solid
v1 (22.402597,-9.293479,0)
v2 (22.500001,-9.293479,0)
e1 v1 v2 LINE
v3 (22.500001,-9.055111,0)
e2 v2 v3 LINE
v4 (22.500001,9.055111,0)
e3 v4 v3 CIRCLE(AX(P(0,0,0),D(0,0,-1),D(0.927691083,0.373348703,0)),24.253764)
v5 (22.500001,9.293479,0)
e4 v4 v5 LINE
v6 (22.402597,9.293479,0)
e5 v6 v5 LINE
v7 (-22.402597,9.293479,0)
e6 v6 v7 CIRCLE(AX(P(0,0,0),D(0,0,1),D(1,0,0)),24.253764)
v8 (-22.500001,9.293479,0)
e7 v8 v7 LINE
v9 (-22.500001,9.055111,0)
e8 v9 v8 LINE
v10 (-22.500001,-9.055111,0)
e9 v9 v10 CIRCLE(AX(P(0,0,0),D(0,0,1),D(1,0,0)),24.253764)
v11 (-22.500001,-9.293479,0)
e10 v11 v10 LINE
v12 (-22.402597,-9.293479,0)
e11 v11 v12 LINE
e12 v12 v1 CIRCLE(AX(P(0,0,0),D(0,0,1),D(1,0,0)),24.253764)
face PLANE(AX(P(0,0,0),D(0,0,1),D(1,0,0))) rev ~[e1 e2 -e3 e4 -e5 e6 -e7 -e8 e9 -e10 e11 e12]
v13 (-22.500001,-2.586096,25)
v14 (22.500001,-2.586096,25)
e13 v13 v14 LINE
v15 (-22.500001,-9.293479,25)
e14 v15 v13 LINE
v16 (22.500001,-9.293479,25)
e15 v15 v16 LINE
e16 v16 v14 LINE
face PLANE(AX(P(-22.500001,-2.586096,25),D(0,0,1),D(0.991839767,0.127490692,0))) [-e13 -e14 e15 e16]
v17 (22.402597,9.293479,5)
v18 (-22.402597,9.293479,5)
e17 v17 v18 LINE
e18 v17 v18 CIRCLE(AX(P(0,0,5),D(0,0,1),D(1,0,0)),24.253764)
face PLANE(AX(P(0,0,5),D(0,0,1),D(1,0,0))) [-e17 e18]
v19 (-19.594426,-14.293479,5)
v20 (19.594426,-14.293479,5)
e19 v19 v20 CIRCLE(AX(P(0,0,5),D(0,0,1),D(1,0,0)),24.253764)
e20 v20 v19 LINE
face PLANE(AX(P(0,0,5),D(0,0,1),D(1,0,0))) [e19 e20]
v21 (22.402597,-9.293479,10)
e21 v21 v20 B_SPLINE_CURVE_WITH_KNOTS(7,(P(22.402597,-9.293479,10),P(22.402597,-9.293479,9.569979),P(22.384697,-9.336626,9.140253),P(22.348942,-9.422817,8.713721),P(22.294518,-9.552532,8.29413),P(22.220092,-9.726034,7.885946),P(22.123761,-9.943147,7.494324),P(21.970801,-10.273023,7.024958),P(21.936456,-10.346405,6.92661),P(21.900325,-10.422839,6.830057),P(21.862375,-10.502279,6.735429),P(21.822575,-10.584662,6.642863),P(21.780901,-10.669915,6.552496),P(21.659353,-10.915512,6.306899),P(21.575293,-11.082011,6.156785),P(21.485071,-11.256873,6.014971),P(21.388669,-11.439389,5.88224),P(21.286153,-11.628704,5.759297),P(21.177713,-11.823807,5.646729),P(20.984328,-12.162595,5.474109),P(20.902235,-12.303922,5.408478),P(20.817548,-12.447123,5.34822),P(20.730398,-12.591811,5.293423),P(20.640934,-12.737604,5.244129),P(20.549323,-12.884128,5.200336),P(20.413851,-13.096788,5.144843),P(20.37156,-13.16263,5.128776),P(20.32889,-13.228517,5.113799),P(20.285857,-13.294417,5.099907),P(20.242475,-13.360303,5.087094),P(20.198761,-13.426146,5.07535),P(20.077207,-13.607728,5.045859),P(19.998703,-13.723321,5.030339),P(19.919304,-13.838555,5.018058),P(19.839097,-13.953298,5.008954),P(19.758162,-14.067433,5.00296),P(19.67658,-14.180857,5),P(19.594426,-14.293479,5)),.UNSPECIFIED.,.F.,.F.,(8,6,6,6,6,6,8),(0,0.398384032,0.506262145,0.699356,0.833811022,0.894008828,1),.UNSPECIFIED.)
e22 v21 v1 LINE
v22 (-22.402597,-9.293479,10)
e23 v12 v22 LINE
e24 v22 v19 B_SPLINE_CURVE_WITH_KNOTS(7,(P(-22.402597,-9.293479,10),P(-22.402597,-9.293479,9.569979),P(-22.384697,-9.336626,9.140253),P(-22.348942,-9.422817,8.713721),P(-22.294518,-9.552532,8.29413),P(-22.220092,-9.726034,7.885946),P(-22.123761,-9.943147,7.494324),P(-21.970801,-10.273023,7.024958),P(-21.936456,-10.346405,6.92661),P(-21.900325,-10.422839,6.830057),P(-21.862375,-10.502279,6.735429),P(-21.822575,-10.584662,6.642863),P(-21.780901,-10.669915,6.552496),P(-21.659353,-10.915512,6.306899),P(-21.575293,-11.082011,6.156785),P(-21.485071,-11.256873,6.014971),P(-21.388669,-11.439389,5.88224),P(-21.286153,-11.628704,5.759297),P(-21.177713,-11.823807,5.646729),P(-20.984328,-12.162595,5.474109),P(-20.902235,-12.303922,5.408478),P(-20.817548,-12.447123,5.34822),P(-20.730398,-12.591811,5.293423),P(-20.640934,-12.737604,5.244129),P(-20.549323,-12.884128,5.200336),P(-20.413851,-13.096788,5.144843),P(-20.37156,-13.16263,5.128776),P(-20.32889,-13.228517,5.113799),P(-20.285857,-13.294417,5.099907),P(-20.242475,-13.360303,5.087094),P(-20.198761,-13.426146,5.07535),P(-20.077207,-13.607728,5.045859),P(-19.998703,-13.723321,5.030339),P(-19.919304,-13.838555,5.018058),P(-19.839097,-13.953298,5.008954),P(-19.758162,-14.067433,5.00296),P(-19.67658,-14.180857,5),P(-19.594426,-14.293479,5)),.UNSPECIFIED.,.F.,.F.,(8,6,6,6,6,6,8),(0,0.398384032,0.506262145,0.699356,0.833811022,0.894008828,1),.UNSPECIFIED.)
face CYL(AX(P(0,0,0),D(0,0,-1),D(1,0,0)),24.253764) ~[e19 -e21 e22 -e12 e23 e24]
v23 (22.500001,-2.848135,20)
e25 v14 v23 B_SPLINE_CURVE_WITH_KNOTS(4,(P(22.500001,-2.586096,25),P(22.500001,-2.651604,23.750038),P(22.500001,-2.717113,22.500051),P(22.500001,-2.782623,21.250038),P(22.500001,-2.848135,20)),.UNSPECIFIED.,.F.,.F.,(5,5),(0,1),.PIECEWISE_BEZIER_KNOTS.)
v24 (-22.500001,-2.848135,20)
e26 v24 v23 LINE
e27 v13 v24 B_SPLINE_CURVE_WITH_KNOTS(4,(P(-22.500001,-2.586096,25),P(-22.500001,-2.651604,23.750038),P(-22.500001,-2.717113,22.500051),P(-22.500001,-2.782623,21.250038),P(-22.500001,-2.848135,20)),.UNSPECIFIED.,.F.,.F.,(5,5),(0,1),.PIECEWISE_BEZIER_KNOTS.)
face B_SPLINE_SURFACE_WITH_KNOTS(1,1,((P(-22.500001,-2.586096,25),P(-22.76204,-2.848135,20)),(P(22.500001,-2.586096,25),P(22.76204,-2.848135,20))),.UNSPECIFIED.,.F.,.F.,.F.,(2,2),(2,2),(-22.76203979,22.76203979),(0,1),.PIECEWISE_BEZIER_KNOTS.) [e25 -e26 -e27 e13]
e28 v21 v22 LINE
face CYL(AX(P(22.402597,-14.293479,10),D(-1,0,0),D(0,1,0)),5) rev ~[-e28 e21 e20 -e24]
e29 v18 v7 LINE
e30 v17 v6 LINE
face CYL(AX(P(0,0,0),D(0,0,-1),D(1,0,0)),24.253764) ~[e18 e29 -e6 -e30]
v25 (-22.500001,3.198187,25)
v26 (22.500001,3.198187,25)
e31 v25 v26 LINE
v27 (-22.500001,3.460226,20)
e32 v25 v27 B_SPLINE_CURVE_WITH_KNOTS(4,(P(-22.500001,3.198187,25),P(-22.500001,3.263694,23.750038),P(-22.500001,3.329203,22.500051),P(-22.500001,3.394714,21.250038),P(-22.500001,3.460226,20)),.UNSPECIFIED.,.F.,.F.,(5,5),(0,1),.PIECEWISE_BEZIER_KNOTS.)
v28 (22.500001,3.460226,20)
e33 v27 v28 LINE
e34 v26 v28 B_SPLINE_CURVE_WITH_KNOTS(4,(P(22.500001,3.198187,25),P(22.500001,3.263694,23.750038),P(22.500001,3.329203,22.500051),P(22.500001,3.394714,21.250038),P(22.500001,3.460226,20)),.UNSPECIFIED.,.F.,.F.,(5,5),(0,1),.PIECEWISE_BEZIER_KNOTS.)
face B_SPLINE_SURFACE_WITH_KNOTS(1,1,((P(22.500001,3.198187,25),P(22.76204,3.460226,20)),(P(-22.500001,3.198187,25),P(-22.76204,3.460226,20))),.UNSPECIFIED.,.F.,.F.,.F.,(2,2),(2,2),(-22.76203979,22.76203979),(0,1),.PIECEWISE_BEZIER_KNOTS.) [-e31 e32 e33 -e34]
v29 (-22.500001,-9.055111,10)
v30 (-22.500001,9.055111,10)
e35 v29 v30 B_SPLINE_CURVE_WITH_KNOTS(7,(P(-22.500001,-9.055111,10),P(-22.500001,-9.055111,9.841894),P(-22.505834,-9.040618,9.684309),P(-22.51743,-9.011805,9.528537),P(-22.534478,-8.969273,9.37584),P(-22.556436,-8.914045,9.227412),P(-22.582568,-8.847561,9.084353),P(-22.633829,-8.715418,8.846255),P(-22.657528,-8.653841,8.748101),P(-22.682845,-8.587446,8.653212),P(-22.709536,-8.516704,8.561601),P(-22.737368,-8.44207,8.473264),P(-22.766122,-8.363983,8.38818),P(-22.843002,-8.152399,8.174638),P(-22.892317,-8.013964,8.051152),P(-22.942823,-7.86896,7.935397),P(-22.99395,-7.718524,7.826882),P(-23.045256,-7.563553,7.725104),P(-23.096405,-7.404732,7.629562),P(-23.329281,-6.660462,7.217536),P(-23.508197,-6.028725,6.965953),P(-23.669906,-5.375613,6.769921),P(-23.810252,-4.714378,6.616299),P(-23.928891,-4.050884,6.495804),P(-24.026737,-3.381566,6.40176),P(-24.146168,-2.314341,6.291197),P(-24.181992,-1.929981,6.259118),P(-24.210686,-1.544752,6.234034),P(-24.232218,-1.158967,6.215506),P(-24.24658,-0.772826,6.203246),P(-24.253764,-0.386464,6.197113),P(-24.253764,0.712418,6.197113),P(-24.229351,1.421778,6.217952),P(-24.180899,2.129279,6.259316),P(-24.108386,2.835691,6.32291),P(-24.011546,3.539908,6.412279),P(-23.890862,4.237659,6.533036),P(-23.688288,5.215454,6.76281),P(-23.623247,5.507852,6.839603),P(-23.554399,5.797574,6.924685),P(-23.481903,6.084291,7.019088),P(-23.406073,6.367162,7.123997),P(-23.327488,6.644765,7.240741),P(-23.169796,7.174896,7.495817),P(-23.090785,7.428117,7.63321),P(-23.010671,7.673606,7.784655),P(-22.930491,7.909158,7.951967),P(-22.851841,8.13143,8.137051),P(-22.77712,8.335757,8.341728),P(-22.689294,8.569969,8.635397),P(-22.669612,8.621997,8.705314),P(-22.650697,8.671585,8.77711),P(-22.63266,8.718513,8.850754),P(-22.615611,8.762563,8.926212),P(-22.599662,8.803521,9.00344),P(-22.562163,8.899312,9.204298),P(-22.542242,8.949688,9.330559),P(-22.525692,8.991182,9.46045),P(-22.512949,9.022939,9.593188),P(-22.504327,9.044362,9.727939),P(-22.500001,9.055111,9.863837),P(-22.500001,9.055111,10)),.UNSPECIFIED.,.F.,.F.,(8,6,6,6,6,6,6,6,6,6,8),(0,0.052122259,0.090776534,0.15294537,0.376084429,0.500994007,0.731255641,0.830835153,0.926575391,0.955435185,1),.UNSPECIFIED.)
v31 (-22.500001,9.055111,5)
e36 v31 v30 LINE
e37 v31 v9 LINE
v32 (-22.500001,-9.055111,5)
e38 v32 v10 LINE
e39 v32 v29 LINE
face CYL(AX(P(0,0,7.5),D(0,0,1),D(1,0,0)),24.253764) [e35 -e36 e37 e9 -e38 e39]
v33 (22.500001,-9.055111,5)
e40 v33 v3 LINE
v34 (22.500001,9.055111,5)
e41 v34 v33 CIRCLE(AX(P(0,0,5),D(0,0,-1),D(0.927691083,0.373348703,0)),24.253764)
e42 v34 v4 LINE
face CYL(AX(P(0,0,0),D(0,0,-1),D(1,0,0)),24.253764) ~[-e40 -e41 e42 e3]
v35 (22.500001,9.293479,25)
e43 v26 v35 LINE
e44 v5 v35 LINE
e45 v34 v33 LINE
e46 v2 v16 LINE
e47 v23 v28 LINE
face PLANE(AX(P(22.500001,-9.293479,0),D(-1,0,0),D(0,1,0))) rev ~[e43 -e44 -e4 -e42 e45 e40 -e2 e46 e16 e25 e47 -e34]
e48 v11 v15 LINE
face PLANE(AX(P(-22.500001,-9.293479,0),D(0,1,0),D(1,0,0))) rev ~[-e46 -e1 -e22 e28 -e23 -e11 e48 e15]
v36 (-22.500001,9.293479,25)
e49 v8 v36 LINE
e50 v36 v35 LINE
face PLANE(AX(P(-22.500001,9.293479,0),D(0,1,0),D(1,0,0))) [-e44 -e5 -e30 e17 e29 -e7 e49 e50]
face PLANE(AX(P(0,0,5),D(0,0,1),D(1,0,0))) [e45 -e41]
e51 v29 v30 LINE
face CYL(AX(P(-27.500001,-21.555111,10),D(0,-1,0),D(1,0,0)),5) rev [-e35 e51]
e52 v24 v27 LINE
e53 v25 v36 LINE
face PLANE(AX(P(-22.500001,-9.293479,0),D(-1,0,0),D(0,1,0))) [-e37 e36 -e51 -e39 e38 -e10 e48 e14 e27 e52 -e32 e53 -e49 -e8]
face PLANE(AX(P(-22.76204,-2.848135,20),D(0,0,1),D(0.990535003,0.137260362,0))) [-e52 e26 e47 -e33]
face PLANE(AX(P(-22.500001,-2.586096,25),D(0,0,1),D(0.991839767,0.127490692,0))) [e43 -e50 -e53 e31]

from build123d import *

# Parameters (mm, degrees)
F0_R        = 24.2537643176
F1_DEPTH    = 5
F2_W        = 45.0000017881
F2_H        = 18.5869578272
F3_DEPTH    = 25
F4_W        = 45.0000017881
F4_H        = 5.7842824608
F5_DEPTH    = 5
F6_DEPTH    = 5
F6_TAPER    = -3
F7_DEPTH    = 5
F7_TAPER    = -3
F8_R        = 5
F9_T4_DEPTH = 43.1102228968
F9_S5_R     = 24.2537643176
F9_T6_DEPTH = 23


# Not quite as in the source:
# - a fillet or chamfer that OpenCascade refuses, or shapes differently, is made with other operations: its cross-section is extruded or revolved along the edge and cut away or added


with BuildPart() as f1:
    # F0 (on Top) → F1 (new body)
    with BuildSketch(Plane.XY):
        Circle(F0_R)
    extrude(amount=F1_DEPTH)

    # F2 (on Top) → F3 (join)
    with BuildSketch(Plane.XY):
        Rectangle(F2_W, F2_H)
    extrude(amount=F3_DEPTH)

    # F4 (on face) → F5 (join)
    with BuildSketch(Plane.XY.offset(25)):
        with Locations((0, 0.3060454037)):
            Rectangle(F4_W, F4_H)
    extrude(amount=-F5_DEPTH)

    # F4 (on face) → F6 (join)
    with BuildSketch(Plane.XY.offset(25)):
        with Locations((0, 0.3060454037)):
            Rectangle(F4_W, F4_H)
    extrude(amount=-F6_DEPTH, taper=F6_TAPER)

    # F4 (on face) → F7 (cut)
    with BuildSketch(Plane.XY.offset(25)):
        with Locations((0, 0.3060454037)):
            Rectangle(F4_W, F4_H)
    extrude(amount=-F7_DEPTH, taper=F7_TAPER, mode=Mode.SUBTRACT)

    # F8
    f8_edges = [f1.edges().sort_by_distance(p)[0] for p in [
        (0, -9.293479, 5),
    ]]
    fillet(f8_edges, radius=F8_R)

    # F9: fillet of radius 5 on 1 edges, made by hand


with BuildPart() as f9_tool2:
    # F9_s3 → F9_t4 (new body)
    with BuildSketch(Plane.XZ.offset(21.5551114484)):
        with BuildLine():
            ThreePointArc((-22.5000008941, 10), (-23.9644669881, 6.4644660941), (-27.5000008941, 5))
            Line((-27.5000008941, 5), (-22.5000008941, 5))
            Line((-22.5000008941, 5), (-22.5000008941, 10))
        make_face()
    extrude(amount=-F9_T4_DEPTH)

    # F9_s5 → F9_t6 (intersect, symmetric)
    with BuildSketch(Plane.XY.offset(7.5)):
        Circle(F9_S5_R)
    extrude(amount=F9_T6_DEPTH, both=True, mode=Mode.INTERSECT)


with BuildPart() as f1_1:
    add(f1.part)

    # F9_t1: union F9_tool2
    add(f9_tool2.part)


solid = f1_1.part
